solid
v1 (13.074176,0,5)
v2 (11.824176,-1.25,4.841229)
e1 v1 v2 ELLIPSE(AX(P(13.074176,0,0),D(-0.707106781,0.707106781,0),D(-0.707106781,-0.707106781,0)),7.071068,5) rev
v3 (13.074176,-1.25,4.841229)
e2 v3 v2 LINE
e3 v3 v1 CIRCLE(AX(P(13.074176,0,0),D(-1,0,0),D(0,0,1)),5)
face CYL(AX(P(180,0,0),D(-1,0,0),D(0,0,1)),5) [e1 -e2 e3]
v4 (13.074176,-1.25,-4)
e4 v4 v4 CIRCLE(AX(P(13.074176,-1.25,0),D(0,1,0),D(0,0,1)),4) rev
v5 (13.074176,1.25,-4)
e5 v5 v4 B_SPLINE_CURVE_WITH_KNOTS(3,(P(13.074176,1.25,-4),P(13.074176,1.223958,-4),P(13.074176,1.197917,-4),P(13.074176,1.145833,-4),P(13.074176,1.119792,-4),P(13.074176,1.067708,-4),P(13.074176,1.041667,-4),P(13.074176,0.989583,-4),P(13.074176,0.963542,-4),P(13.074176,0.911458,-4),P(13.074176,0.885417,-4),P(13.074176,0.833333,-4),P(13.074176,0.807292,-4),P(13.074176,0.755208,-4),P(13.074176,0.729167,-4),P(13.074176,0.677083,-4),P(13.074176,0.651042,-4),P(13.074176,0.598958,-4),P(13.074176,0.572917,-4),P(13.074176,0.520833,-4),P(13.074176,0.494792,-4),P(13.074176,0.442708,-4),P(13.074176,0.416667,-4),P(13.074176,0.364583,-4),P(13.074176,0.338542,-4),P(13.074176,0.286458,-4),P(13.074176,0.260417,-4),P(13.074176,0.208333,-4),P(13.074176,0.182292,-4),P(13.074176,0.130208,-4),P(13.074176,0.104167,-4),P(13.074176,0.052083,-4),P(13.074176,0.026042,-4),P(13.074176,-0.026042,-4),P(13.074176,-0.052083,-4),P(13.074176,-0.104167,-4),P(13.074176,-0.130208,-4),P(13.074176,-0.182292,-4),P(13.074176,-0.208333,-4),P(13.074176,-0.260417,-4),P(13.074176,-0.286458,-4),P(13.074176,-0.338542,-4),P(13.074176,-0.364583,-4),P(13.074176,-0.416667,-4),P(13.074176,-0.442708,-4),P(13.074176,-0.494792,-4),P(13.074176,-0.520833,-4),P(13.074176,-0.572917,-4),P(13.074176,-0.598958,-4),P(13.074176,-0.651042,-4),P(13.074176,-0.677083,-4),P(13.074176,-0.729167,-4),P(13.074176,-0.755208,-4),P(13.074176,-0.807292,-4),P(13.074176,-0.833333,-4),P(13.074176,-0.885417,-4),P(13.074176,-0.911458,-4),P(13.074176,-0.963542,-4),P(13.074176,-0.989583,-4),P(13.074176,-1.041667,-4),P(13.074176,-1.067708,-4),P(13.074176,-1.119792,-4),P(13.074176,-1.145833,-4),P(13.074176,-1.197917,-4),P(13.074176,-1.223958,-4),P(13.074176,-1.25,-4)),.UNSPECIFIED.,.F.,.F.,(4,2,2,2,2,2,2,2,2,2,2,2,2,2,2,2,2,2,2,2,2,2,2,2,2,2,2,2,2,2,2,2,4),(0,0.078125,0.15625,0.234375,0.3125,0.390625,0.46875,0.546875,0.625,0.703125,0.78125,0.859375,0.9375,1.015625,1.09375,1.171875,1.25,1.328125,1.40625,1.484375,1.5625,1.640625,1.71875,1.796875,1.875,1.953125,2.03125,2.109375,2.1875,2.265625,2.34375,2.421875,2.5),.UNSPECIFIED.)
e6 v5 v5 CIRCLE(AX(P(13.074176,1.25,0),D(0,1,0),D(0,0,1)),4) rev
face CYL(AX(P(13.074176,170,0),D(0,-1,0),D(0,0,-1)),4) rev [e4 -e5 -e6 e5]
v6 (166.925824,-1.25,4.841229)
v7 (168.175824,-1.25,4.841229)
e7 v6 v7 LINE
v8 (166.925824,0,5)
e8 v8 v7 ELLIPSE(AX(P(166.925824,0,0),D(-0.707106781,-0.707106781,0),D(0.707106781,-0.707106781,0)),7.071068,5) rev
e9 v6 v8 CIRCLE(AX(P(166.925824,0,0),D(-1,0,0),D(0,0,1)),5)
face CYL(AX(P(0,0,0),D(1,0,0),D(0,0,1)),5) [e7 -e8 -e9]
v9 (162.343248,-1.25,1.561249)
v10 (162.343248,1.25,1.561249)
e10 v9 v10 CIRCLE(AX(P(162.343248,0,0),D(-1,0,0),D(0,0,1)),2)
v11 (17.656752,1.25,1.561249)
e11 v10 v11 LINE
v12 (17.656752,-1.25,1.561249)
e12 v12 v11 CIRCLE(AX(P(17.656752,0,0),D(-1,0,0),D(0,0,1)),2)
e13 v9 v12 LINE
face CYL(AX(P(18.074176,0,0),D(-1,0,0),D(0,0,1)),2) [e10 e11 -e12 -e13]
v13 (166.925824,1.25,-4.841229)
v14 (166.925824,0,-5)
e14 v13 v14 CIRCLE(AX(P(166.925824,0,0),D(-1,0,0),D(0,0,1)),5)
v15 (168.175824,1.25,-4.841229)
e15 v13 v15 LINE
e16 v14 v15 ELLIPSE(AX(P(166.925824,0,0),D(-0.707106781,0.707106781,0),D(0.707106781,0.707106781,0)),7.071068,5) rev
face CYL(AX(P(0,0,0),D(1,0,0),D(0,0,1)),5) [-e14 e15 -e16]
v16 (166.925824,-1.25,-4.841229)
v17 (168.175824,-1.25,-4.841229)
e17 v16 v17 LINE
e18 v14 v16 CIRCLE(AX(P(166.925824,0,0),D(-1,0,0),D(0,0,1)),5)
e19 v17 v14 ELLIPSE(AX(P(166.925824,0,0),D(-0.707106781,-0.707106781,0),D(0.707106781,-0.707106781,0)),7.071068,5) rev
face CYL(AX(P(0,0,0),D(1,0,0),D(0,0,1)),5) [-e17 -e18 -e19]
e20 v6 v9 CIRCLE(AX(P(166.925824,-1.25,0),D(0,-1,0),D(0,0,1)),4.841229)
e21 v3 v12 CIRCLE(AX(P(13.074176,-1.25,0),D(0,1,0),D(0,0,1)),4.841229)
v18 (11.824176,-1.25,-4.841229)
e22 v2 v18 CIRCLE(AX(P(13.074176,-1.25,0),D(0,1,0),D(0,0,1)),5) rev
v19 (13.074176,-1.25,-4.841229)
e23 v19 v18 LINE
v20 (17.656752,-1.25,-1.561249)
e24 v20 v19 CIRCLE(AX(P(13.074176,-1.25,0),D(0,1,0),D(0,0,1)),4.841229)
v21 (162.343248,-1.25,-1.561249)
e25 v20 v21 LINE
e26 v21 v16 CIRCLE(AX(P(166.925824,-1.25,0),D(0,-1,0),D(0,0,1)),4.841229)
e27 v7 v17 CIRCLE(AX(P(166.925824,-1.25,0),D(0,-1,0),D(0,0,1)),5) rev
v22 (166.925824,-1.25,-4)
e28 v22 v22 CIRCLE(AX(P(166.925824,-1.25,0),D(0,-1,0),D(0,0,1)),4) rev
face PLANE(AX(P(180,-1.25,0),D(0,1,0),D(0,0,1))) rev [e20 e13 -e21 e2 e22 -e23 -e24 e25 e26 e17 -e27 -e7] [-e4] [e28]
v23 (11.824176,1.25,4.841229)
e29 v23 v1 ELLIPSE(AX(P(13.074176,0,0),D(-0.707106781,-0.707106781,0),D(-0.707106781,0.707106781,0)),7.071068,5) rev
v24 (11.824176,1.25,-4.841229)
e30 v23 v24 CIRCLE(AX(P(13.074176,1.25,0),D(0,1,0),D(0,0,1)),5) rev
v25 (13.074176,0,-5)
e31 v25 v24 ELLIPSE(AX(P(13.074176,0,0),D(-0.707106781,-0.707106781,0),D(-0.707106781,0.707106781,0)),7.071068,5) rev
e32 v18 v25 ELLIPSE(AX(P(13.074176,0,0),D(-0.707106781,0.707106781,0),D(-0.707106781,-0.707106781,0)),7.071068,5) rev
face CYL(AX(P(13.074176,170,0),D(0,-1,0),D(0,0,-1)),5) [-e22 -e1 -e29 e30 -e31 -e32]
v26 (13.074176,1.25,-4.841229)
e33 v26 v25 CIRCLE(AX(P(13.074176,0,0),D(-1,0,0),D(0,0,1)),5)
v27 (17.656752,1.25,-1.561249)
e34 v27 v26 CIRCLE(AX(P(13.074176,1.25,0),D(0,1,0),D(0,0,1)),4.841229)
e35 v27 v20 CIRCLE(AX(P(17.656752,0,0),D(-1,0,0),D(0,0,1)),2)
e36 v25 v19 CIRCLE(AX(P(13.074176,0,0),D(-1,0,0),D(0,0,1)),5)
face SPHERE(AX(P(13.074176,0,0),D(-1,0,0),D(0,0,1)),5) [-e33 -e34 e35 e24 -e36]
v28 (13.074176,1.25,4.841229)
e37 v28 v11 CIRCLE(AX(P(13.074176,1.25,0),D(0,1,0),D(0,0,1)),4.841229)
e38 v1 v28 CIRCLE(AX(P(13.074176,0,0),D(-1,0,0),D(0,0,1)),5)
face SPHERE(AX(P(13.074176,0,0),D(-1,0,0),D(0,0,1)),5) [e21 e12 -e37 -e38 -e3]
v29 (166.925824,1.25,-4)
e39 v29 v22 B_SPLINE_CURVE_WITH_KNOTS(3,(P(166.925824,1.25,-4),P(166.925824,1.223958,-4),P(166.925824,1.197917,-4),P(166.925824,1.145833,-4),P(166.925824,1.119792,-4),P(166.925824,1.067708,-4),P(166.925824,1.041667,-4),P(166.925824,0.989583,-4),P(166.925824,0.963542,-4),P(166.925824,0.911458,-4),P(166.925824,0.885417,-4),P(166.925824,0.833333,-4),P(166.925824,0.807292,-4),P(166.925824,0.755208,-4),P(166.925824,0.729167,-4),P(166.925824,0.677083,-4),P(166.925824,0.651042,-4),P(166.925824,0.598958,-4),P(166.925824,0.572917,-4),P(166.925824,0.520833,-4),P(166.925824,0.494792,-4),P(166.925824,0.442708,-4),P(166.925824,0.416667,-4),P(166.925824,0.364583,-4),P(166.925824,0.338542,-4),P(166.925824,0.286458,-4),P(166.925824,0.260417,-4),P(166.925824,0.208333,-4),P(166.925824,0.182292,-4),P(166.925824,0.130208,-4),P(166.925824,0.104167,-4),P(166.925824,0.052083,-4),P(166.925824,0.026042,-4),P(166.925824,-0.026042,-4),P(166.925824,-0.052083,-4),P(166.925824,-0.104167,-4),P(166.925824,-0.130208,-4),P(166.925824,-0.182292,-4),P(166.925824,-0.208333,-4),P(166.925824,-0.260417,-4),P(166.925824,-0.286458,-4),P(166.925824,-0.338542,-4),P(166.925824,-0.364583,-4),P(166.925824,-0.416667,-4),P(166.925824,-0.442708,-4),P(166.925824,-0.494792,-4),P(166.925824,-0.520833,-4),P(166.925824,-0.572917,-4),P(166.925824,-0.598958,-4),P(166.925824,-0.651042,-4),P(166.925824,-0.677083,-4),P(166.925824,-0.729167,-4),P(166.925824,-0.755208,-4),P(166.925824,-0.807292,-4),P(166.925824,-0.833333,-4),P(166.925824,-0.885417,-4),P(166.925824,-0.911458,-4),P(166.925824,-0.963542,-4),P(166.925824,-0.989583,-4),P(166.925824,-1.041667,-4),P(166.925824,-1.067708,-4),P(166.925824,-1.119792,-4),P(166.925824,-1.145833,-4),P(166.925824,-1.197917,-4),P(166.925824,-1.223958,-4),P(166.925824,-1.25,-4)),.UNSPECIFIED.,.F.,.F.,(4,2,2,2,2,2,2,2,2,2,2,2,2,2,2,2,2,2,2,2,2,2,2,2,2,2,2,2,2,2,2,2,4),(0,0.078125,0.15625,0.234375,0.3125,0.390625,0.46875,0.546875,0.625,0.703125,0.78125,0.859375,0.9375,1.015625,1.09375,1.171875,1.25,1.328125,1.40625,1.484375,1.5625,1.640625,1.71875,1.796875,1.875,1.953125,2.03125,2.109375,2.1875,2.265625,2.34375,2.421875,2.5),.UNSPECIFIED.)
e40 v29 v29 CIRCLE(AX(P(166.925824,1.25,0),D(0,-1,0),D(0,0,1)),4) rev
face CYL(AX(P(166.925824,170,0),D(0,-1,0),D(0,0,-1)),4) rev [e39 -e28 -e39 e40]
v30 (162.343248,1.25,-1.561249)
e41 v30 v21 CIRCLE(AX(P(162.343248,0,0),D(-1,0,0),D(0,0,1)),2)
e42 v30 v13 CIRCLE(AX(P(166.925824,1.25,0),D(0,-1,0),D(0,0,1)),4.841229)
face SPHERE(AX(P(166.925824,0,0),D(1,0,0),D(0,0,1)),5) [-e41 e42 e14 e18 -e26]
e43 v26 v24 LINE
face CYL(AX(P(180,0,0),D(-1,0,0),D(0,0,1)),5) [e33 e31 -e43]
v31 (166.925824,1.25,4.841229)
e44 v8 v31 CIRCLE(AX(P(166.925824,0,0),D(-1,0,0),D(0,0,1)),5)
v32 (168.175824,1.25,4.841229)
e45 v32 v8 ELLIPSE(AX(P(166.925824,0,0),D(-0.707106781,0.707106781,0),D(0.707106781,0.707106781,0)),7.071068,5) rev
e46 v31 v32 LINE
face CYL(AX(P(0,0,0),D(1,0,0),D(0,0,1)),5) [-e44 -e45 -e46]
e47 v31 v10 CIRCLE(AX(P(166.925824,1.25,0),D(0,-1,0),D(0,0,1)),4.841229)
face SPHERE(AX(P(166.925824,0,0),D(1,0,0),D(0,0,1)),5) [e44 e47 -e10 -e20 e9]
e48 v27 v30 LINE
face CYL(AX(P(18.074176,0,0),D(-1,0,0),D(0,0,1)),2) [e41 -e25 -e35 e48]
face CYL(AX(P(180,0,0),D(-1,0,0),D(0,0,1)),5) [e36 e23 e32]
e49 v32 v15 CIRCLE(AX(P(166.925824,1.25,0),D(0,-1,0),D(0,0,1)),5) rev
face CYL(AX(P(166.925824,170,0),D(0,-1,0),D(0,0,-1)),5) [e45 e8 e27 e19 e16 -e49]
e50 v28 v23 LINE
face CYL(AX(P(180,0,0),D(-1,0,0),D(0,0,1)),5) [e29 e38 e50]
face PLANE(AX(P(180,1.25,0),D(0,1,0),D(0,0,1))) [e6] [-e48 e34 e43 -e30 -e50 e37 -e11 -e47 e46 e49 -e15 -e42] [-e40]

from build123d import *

# Parameters (mm, degrees)
EXTRUDE_1_DEPTH         = 180
CUT_EXTRUDE_START       = -1.25
CUT_EXTRUDE_1_OUTLINE_W = 200.912361756
CUT_EXTRUDE_1_OUTLINE_H = 41.35790762
CUT_EXTRUDE_1_OUTLINE_R = 4
CUT_EXTRUDE_1_DEPTH     = 2.5


# Read off the part's stored shape, not the designer's step: 切除-拉伸1
with BuildPart() as part:
    # 草图2 → 凸台-拉伸1 (new body)
    with BuildSketch(Plane(origin=(0, 0, 0), x_dir=(0, 0, -1), z_dir=(1, 0, 0))):
        with BuildLine():
            Line((4.841229183, 1.25), (0, 1.25))
            Line((0, 1.25), (0, -1.25))
            Line((0, -1.25), (4.841229183, -1.25))
            ThreePointArc((4.841229183, -1.25), (4.960148481, -0.630021462), (5, 0))
            ThreePointArc((5, 0), (4.960148481, 0.630021462), (4.841229183, 1.25))
        make_face()
        with BuildLine():
            Line((0, -1.25), (0, 1.25))
            Line((0, 1.25), (-4.841229183, 1.25))
            ThreePointArc((-4.841229183, 1.25), (-5, 0), (-4.841229183, -1.25))
            Line((-4.841229183, -1.25), (0, -1.25))
        make_face()
    extrude(amount=EXTRUDE_1_DEPTH)

    # 切除-拉伸1 outline → 切除-拉伸1 (cut)
    # profile 1 of 2: a face of its own
    with BuildSketch(Plane(origin=(0, 0, 0), x_dir=(1, 0, 0), z_dir=(0, 1, 0)).offset(CUT_EXTRUDE_START)):
        with Locations((92.35420838, -2.241239646)):
            Rectangle(CUT_EXTRUDE_1_OUTLINE_W, CUT_EXTRUDE_1_OUTLINE_H)
        with BuildLine():
            Line((90, 5), (90, -5))
            Line((90, -5), (13.074176, -5))
            ThreePointArc((13.074176, -5), (8.074176, 0), (13.074176, 5))
            Line((13.074176, 5), (90, 5))
        make_face(mode=Mode.SUBTRACT)
    # profile 2 of 2: a face of its own
    with BuildSketch(Plane(origin=(0, 0, 0), x_dir=(1, 0, 0), z_dir=(0, 1, 0)).offset(CUT_EXTRUDE_START)):
        with Locations((13.074176, 0)):
            Circle(CUT_EXTRUDE_1_OUTLINE_R)
    extrude(amount=CUT_EXTRUDE_1_DEPTH, mode=Mode.SUBTRACT)

    # 草图4 → 切除-旋转3 (revolve, cut)
    with BuildSketch(Plane(origin=(0, 0, 0), x_dir=(1, 0, 0), z_dir=(0, 1, 0))):
        with BuildLine():
            Line((17.656751695, 2), (93.188618098, 2))
            Line((93.188618098, 2), (93.188618098, 5))
            Line((93.188618098, 5), (13.074176, 5))
            ThreePointArc((13.074176, 5), (15.812788788, 4.183300133), (17.656751695, 2))
        make_face()
        with BuildLine():
            Line((93.188618098, -4.841229183), (93.188618098, -2))
            Line((93.188618098, -2), (17.656751695, -2))
            ThreePointArc((17.656751695, -2), (16.318074985, -3.804880993), (14.324176, -4.841229183))
            Line((14.324176, -4.841229183), (93.188618098, -4.841229183))
        make_face()
    revolve(axis=Axis((18.074176, 0, 0), (1, 0, 0)), mode=Mode.SUBTRACT)

    # 镜向1: part across plane


with BuildPart() as part_1:
    add(part.part)
    add(part.part.mirror(Plane(origin=(90, 170, 0), x_dir=(0, 0, 1), z_dir=(1, 0, 0))))


solid = part_1.part
